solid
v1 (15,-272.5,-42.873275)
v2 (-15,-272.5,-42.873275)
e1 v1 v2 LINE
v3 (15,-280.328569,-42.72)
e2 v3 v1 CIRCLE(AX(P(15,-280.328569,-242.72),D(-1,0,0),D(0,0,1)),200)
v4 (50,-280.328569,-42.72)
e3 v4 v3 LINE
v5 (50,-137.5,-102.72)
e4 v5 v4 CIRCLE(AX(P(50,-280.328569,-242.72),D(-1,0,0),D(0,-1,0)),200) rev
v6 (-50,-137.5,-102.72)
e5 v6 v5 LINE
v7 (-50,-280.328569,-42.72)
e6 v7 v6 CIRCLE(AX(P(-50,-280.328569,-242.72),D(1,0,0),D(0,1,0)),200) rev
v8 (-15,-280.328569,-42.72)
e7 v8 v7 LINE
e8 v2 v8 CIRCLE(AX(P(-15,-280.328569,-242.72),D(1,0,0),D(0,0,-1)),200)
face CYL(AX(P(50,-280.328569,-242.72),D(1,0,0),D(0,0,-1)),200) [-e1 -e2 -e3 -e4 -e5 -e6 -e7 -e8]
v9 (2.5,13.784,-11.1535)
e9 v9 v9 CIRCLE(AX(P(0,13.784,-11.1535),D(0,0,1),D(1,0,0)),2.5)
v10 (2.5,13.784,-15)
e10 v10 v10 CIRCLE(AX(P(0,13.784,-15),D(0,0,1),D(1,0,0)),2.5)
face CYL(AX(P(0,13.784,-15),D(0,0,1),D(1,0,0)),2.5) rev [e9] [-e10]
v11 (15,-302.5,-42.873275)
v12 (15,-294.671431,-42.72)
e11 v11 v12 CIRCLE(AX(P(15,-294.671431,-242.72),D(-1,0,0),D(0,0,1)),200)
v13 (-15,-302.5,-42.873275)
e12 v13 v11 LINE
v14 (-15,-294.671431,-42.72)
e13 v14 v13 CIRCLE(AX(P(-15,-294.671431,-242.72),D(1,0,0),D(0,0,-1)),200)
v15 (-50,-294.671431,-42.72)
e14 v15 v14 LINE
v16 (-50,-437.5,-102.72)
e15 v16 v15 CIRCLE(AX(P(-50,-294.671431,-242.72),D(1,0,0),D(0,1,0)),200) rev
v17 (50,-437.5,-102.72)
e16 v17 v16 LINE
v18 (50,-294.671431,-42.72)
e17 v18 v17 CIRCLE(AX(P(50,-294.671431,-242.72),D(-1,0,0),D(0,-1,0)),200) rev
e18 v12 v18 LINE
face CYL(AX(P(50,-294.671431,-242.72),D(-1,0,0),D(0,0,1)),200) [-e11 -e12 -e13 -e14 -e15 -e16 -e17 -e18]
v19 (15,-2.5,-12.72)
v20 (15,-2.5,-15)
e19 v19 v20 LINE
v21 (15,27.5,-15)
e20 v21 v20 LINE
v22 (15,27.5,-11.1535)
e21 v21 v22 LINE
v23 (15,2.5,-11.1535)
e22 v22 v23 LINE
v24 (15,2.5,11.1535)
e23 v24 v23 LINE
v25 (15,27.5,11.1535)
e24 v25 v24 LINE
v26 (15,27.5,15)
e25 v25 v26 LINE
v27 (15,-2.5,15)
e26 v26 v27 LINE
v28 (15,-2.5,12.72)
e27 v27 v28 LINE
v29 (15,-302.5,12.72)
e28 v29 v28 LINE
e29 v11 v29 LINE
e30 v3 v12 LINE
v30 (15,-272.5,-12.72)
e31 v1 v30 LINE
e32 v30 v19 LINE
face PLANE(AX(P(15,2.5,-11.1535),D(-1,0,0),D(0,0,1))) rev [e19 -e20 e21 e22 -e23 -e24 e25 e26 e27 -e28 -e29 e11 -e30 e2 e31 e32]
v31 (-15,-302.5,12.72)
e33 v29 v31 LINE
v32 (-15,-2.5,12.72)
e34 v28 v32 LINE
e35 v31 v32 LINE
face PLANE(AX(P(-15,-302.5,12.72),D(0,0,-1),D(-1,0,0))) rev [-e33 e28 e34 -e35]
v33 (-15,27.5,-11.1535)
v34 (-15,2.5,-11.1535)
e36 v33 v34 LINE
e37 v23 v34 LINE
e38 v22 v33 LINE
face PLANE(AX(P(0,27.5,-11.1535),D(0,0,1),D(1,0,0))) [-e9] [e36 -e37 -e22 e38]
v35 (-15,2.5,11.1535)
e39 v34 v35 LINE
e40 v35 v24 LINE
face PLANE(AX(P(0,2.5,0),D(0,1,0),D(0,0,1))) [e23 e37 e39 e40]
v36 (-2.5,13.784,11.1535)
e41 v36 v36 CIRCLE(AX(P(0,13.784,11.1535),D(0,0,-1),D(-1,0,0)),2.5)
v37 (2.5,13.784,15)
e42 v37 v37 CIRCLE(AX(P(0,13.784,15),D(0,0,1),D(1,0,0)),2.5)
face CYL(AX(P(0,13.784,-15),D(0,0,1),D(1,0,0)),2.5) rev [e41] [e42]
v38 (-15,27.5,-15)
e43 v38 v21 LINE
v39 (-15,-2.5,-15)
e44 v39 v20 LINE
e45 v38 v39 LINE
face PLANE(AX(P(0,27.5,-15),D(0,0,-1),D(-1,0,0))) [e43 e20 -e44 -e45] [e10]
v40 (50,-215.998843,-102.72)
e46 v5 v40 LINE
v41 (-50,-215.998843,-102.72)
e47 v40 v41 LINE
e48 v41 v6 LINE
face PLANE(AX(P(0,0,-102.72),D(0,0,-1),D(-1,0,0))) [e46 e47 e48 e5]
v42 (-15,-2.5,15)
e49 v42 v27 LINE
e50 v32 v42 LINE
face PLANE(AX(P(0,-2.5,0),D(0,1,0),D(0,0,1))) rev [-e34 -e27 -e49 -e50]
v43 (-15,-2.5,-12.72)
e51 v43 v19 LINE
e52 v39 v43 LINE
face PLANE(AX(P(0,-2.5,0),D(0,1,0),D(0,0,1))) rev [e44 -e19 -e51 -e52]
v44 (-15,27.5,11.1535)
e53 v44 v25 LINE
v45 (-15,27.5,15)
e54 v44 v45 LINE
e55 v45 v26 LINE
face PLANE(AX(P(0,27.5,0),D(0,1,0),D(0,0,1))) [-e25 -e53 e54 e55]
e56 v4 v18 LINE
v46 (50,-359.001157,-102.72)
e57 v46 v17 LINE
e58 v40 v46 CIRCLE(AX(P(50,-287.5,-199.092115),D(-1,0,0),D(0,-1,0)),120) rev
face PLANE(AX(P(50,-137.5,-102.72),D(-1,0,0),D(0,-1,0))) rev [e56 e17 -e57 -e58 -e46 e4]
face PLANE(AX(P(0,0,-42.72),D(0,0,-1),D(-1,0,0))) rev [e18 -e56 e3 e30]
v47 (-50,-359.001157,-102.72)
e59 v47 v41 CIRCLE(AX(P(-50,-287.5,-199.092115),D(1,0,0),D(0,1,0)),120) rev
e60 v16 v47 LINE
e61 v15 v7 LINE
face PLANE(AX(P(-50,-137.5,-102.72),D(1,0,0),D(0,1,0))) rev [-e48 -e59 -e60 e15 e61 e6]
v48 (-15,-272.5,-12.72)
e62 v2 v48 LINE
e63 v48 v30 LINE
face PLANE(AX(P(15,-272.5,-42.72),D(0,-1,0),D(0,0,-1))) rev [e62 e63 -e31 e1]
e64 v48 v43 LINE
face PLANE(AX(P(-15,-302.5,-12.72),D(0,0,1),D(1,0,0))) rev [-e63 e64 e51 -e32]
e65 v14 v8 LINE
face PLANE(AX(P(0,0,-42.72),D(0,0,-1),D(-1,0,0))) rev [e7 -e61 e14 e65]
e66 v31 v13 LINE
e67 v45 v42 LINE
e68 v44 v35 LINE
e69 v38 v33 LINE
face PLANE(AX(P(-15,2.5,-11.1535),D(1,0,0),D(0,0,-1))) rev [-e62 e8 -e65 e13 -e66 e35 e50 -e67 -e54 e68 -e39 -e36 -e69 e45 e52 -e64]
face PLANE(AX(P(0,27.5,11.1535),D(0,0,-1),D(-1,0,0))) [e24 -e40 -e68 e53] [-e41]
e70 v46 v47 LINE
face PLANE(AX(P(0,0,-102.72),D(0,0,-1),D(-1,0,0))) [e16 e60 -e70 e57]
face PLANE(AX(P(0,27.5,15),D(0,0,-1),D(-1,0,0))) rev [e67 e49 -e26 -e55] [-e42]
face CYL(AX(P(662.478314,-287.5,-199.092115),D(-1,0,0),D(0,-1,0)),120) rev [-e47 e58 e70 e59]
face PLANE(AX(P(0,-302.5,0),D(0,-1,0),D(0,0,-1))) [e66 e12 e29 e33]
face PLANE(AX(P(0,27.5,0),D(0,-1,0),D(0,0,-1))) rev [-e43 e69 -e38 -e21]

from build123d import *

# Parameters (mm, degrees)
SKETCH_1_W               = 30
SKETCH_1_H               = 22.307
EXTRUDE_1_DEPTH          = 2.5
EXTRUDE_START            = -5
SKETCH_4_W               = 30
SKETCH_4_H               = 3.8465
EXTRUDE_5_DEPTH          = 30
SKETCH_5_R               = 2.5
CUT_EXTRUDE_1_DEPTH      = 44.373378932
SKETCH_6_W               = 30
SKETCH_6_H               = 25.44
EXTRUDE_6_DEPTH          = 300
SKETCH_8_W               = 30
SKETCH_8_H               = 30
EXTRUDE_8_DEPTH          = 30
SKETCH_10_W              = 100
SKETCH_10_H              = 300
EXTRUDE_9_DEPTH          = 60
FILLET_1_R               = 200
FILLET_2_R               = 200
CUT_EXTRUDE_3_DEPTH      = 461.388584133
CUT_EXTRUDE_3_DEPTH_BACK = 461.388584133


with BuildPart() as part:
    # 草图1 → 凸台-拉伸1 (new, symmetric)
    with BuildSketch(Plane(origin=(0, 0, 0), x_dir=(1, 0, 0), z_dir=(0, 1, 0))):
        Rectangle(SKETCH_1_W, SKETCH_1_H)
    extrude(amount=EXTRUDE_1_DEPTH, both=True)

    # 草图4 → 凸台-拉伸5 (add)
    with BuildSketch(Plane(origin=(0, 2.5, 0), x_dir=(1, 0, 0), z_dir=(0, 1, 0)).offset(EXTRUDE_START)):
        with Locations((0, -13.07675)):
            Rectangle(SKETCH_4_W, SKETCH_4_H)
        with Locations((0, 13.07675)):
            Rectangle(SKETCH_4_W, SKETCH_4_H)
    extrude(amount=EXTRUDE_5_DEPTH)

    # 草图5 → 切除-拉伸1 (cut, through all)
    with BuildSketch(Plane.XY.offset(15)):
        with Locations((0, 13.784)):
            Circle(SKETCH_5_R)
    extrude(amount=-CUT_EXTRUDE_1_DEPTH, mode=Mode.SUBTRACT)

    # 草图6 → 凸台-拉伸6 (add)
    with BuildSketch(Plane.XZ.offset(2.5)):
        Rectangle(SKETCH_6_W, SKETCH_6_H)
    extrude(amount=EXTRUDE_6_DEPTH)

    # 草图8 → 凸台-拉伸8 (add)
    with BuildSketch(Plane(origin=(0, 0, -12.72), x_dir=(-1, 0, 0), z_dir=(0, 0, -1))):
        with Locations((0, -287.5)):
            Rectangle(SKETCH_8_W, SKETCH_8_H)
    extrude(amount=EXTRUDE_8_DEPTH)

    # 草图10 → 凸台-拉伸9 (add)
    with BuildSketch(Plane(origin=(0, 0, -42.72), x_dir=(-1, 0, 0), z_dir=(0, 0, -1))):
        with Locations((0, -287.5)):
            Rectangle(SKETCH_10_W, SKETCH_10_H)
    extrude(amount=EXTRUDE_9_DEPTH)

    # 圆角1
    # the kernel refuses this fillet: 200 mm, written as the material it takes off along each edge
    with BuildSketch(Plane(origin=(-407.071421427, -437.5, -42.72), x_dir=(0, 1, 0), z_dir=(1, 0, 0))) as fillet_1_piece_1_section:
        with BuildLine():
            CenterArc((142.828568571, -200), FILLET_1_R, 90, 45.572995999)
            Line((0, -60), (-2.856571371, -57.2))
            ThreePointArc((-2.856571371, -57.2), (-4, -30), (-4, 0))
            Line((-4, 0), (0, 4))
            Line((0, 4), (142.828568571, 4))
            Line((142.828568571, 4), (142.828568571, 0))
        make_face()
    fillet_1_piece_1 = extrude(amount=814.142842854, mode=Mode.PRIVATE)
    fillet_1_piece_1 = split(fillet_1_piece_1, bisect_by=Plane(origin=(-211.035710714, -302.5, -40.745799624), z_dir=(0, 1, 0)), keep=Keep.TOP, mode=Mode.PRIVATE)
    fillet_1_piece_1 = split(fillet_1_piece_1, bisect_by=Plane(origin=(-15, -298.610396999, -40.745799624), z_dir=(-1, 0, 0)), keep=Keep.TOP, mode=Mode.PRIVATE)
    add(fillet_1_piece_1, mode=Mode.SUBTRACT)
    with BuildSketch(Plane(origin=(-407.071421427, -437.5, -42.72), x_dir=(0, 1, 0), z_dir=(1, 0, 0))) as fillet_1_piece_2_section:
        with BuildLine():
            CenterArc((142.828568571, -200), FILLET_1_R, 90, 45.572995999)
            Line((0, -60), (-2.856571371, -57.2))
            ThreePointArc((-2.856571371, -57.2), (-4, -30), (-4, 0))
            Line((-4, 0), (0, 4))
            Line((0, 4), (142.828568571, 4))
            Line((142.828568571, 4), (142.828568571, 0))
        make_face()
    fillet_1_piece_2 = extrude(amount=814.142842854, mode=Mode.PRIVATE)
    fillet_1_piece_2 = split(fillet_1_piece_2, bisect_by=Plane(origin=(-211.035710714, -302.5, -57.711003377), z_dir=(0, -1, 0)), keep=Keep.TOP, mode=Mode.PRIVATE)
    fillet_1_piece_2 = split(fillet_1_piece_2, bisect_by=Plane(origin=(-15, -400.231636696, -57.711003377), z_dir=(-1, 0, 0)), keep=Keep.TOP, mode=Mode.PRIVATE)
    add(fillet_1_piece_2, mode=Mode.SUBTRACT)
    with BuildSketch(Plane(origin=(-407.071421427, -437.5, -42.72), x_dir=(0, 1, 0), z_dir=(1, 0, 0))) as fillet_1_piece_3_section:
        with BuildLine():
            CenterArc((142.828568571, -200), FILLET_1_R, 90, 45.572995999)
            Line((0, -60), (-2.856571371, -57.2))
            ThreePointArc((-2.856571371, -57.2), (-4, -30), (-4, 0))
            Line((-4, 0), (0, 4))
            Line((0, 4), (142.828568571, 4))
            Line((142.828568571, 4), (142.828568571, 0))
        make_face()
    fillet_1_piece_3 = extrude(amount=814.142842854, mode=Mode.PRIVATE)
    fillet_1_piece_3 = split(fillet_1_piece_3, bisect_by=Plane(origin=(0, -302.5, -57.711003377), z_dir=(0, -1, 0)), keep=Keep.TOP, mode=Mode.PRIVATE)
    fillet_1_piece_3 = split(fillet_1_piece_3, bisect_by=Plane(origin=(15, -400.231636696, -57.711003377), z_dir=(-1, 0, 0)), keep=Keep.TOP, mode=Mode.PRIVATE)
    fillet_1_piece_3 = split(fillet_1_piece_3, bisect_by=Plane(origin=(-15, -400.231636696, -57.711003377), z_dir=(1, 0, 0)), keep=Keep.TOP, mode=Mode.PRIVATE)
    add(fillet_1_piece_3, mode=Mode.SUBTRACT)
    with BuildSketch(Plane(origin=(-407.071421427, -437.5, -42.72), x_dir=(0, 1, 0), z_dir=(1, 0, 0))) as fillet_1_piece_4_section:
        with BuildLine():
            CenterArc((142.828568571, -200), FILLET_1_R, 90, 45.572995999)
            Line((0, -60), (-2.856571371, -57.2))
            ThreePointArc((-2.856571371, -57.2), (-4, -30), (-4, 0))
            Line((-4, 0), (0, 4))
            Line((0, 4), (142.828568571, 4))
            Line((142.828568571, 4), (142.828568571, 0))
        make_face()
    fillet_1_piece_4 = extrude(amount=814.142842854, mode=Mode.PRIVATE)
    fillet_1_piece_4 = split(fillet_1_piece_4, bisect_by=Plane(origin=(211.035710714, -302.5, -40.745799624), z_dir=(0, 1, 0)), keep=Keep.TOP, mode=Mode.PRIVATE)
    fillet_1_piece_4 = split(fillet_1_piece_4, bisect_by=Plane(origin=(15, -298.610396999, -40.745799624), z_dir=(1, 0, 0)), keep=Keep.TOP, mode=Mode.PRIVATE)
    add(fillet_1_piece_4, mode=Mode.SUBTRACT)
    with BuildSketch(Plane(origin=(-407.071421427, -437.5, -42.72), x_dir=(0, 1, 0), z_dir=(1, 0, 0))) as fillet_1_piece_5_section:
        with BuildLine():
            CenterArc((142.828568571, -200), FILLET_1_R, 90, 45.572995999)
            Line((0, -60), (-2.856571371, -57.2))
            ThreePointArc((-2.856571371, -57.2), (-4, -30), (-4, 0))
            Line((-4, 0), (0, 4))
            Line((0, 4), (142.828568571, 4))
            Line((142.828568571, 4), (142.828568571, 0))
        make_face()
    fillet_1_piece_5 = extrude(amount=814.142842854, mode=Mode.PRIVATE)
    fillet_1_piece_5 = split(fillet_1_piece_5, bisect_by=Plane(origin=(211.035710714, -302.5, -57.711003377), z_dir=(0, -1, 0)), keep=Keep.TOP, mode=Mode.PRIVATE)
    fillet_1_piece_5 = split(fillet_1_piece_5, bisect_by=Plane(origin=(15, -400.231636696, -57.711003377), z_dir=(1, 0, 0)), keep=Keep.TOP, mode=Mode.PRIVATE)
    add(fillet_1_piece_5, mode=Mode.SUBTRACT)

    # 圆角2
    # the kernel refuses this fillet: 200 mm, written as the material it takes off along each edge
    with BuildSketch(Plane(origin=(407.071421427, -137.5, -42.72), x_dir=(0, 0, -1), z_dir=(-1, 0, 0))) as fillet_2_piece_1_section:
        with BuildLine():
            CenterArc((200, 142.828568571), FILLET_2_R, 180, 45.572995999)
            Line((0, 142.828568571), (-4, 142.828568571))
            Line((-4, 142.828568571), (-4, 0))
            Line((-4, 0), (0, -4))
            ThreePointArc((0, -4), (30, -4), (57.2, -2.856571371))
            Line((57.2, -2.856571371), (60, 0))
        make_face()
    fillet_2_piece_1 = extrude(amount=814.142842854, mode=Mode.PRIVATE)
    fillet_2_piece_1 = split(fillet_2_piece_1, bisect_by=Plane(origin=(15, -174.768363304, -57.711003377), z_dir=(1, 0, 0)), keep=Keep.TOP, mode=Mode.PRIVATE)
    fillet_2_piece_1 = split(fillet_2_piece_1, bisect_by=Plane(origin=(211.035710714, -272.5, -57.711003377), z_dir=(0, 1, 0)), keep=Keep.TOP, mode=Mode.PRIVATE)
    add(fillet_2_piece_1, mode=Mode.SUBTRACT)
    with BuildSketch(Plane(origin=(407.071421427, -137.5, -42.72), x_dir=(0, 0, -1), z_dir=(-1, 0, 0))) as fillet_2_piece_2_section:
        with BuildLine():
            CenterArc((200, 142.828568571), FILLET_2_R, 180, 45.572995999)
            Line((0, 142.828568571), (-4, 142.828568571))
            Line((-4, 142.828568571), (-4, 0))
            Line((-4, 0), (0, -4))
            ThreePointArc((0, -4), (30, -4), (57.2, -2.856571371))
            Line((57.2, -2.856571371), (60, 0))
        make_face()
    fillet_2_piece_2 = extrude(amount=814.142842854, mode=Mode.PRIVATE)
    fillet_2_piece_2 = split(fillet_2_piece_2, bisect_by=Plane(origin=(15, -276.389603001, -40.745799624), z_dir=(1, 0, 0)), keep=Keep.TOP, mode=Mode.PRIVATE)
    fillet_2_piece_2 = split(fillet_2_piece_2, bisect_by=Plane(origin=(211.035710714, -272.5, -40.745799624), z_dir=(0, -1, 0)), keep=Keep.TOP, mode=Mode.PRIVATE)
    add(fillet_2_piece_2, mode=Mode.SUBTRACT)
    with BuildSketch(Plane(origin=(407.071421427, -137.5, -42.72), x_dir=(0, 0, -1), z_dir=(-1, 0, 0))) as fillet_2_piece_3_section:
        with BuildLine():
            CenterArc((200, 142.828568571), FILLET_2_R, 180, 45.572995999)
            Line((0, 142.828568571), (-4, 142.828568571))
            Line((-4, 142.828568571), (-4, 0))
            Line((-4, 0), (0, -4))
            ThreePointArc((0, -4), (30, -4), (57.2, -2.856571371))
            Line((57.2, -2.856571371), (60, 0))
        make_face()
    fillet_2_piece_3 = extrude(amount=814.142842854, mode=Mode.PRIVATE)
    fillet_2_piece_3 = split(fillet_2_piece_3, bisect_by=Plane(origin=(15, -174.768363304, -57.711003377), z_dir=(-1, 0, 0)), keep=Keep.TOP, mode=Mode.PRIVATE)
    fillet_2_piece_3 = split(fillet_2_piece_3, bisect_by=Plane(origin=(0, -272.5, -57.711003377), z_dir=(0, 1, 0)), keep=Keep.TOP, mode=Mode.PRIVATE)
    fillet_2_piece_3 = split(fillet_2_piece_3, bisect_by=Plane(origin=(-15, -174.768363304, -57.711003377), z_dir=(1, 0, 0)), keep=Keep.TOP, mode=Mode.PRIVATE)
    add(fillet_2_piece_3, mode=Mode.SUBTRACT)
    with BuildSketch(Plane(origin=(407.071421427, -137.5, -42.72), x_dir=(0, 0, -1), z_dir=(-1, 0, 0))) as fillet_2_piece_4_section:
        with BuildLine():
            CenterArc((200, 142.828568571), FILLET_2_R, 180, 45.572995999)
            Line((0, 142.828568571), (-4, 142.828568571))
            Line((-4, 142.828568571), (-4, 0))
            Line((-4, 0), (0, -4))
            ThreePointArc((0, -4), (30, -4), (57.2, -2.856571371))
            Line((57.2, -2.856571371), (60, 0))
        make_face()
    fillet_2_piece_4 = extrude(amount=814.142842854, mode=Mode.PRIVATE)
    fillet_2_piece_4 = split(fillet_2_piece_4, bisect_by=Plane(origin=(-211.035710714, -272.5, -57.711003377), z_dir=(0, 1, 0)), keep=Keep.TOP, mode=Mode.PRIVATE)
    fillet_2_piece_4 = split(fillet_2_piece_4, bisect_by=Plane(origin=(-15, -174.768363304, -57.711003377), z_dir=(-1, 0, 0)), keep=Keep.TOP, mode=Mode.PRIVATE)
    add(fillet_2_piece_4, mode=Mode.SUBTRACT)
    with BuildSketch(Plane(origin=(407.071421427, -137.5, -42.72), x_dir=(0, 0, -1), z_dir=(-1, 0, 0))) as fillet_2_piece_5_section:
        with BuildLine():
            CenterArc((200, 142.828568571), FILLET_2_R, 180, 45.572995999)
            Line((0, 142.828568571), (-4, 142.828568571))
            Line((-4, 142.828568571), (-4, 0))
            Line((-4, 0), (0, -4))
            ThreePointArc((0, -4), (30, -4), (57.2, -2.856571371))
            Line((57.2, -2.856571371), (60, 0))
        make_face()
    fillet_2_piece_5 = extrude(amount=814.142842854, mode=Mode.PRIVATE)
    fillet_2_piece_5 = split(fillet_2_piece_5, bisect_by=Plane(origin=(-211.035710714, -272.5, -40.745799624), z_dir=(0, -1, 0)), keep=Keep.TOP, mode=Mode.PRIVATE)
    fillet_2_piece_5 = split(fillet_2_piece_5, bisect_by=Plane(origin=(-15, -276.389603001, -40.745799624), z_dir=(-1, 0, 0)), keep=Keep.TOP, mode=Mode.PRIVATE)
    add(fillet_2_piece_5, mode=Mode.SUBTRACT)

    # 草图11 → 切除-拉伸3 (cut, two sides: drawn at the far end of the back side and taken through both)
    with BuildSketch(Plane(origin=(50, 0, 0), x_dir=(0, 0, -1), z_dir=(1, 0, 0)).offset(-CUT_EXTRUDE_3_DEPTH_BACK)):
        with BuildLine():
            Line((590.156631814, 440.987720299), (102.72, -215.998843293))
            ThreePointArc((102.72, -215.998843293), (79.092115208, -287.5), (102.72, -359.001156707))
            Line((102.72, -359.001156707), (590.156631814, -1015.987720299))
            Line((590.156631814, -1015.987720299), (2226.281095019, -1015.987720299))
            Line((2226.281095019, -1015.987720299), (2226.281095019, 440.987720299))
            Line((2226.281095019, 440.987720299), (590.156631814, 440.987720299))
        make_face()
    extrude(amount=CUT_EXTRUDE_3_DEPTH + CUT_EXTRUDE_3_DEPTH_BACK, mode=Mode.SUBTRACT)


solid = part.part
